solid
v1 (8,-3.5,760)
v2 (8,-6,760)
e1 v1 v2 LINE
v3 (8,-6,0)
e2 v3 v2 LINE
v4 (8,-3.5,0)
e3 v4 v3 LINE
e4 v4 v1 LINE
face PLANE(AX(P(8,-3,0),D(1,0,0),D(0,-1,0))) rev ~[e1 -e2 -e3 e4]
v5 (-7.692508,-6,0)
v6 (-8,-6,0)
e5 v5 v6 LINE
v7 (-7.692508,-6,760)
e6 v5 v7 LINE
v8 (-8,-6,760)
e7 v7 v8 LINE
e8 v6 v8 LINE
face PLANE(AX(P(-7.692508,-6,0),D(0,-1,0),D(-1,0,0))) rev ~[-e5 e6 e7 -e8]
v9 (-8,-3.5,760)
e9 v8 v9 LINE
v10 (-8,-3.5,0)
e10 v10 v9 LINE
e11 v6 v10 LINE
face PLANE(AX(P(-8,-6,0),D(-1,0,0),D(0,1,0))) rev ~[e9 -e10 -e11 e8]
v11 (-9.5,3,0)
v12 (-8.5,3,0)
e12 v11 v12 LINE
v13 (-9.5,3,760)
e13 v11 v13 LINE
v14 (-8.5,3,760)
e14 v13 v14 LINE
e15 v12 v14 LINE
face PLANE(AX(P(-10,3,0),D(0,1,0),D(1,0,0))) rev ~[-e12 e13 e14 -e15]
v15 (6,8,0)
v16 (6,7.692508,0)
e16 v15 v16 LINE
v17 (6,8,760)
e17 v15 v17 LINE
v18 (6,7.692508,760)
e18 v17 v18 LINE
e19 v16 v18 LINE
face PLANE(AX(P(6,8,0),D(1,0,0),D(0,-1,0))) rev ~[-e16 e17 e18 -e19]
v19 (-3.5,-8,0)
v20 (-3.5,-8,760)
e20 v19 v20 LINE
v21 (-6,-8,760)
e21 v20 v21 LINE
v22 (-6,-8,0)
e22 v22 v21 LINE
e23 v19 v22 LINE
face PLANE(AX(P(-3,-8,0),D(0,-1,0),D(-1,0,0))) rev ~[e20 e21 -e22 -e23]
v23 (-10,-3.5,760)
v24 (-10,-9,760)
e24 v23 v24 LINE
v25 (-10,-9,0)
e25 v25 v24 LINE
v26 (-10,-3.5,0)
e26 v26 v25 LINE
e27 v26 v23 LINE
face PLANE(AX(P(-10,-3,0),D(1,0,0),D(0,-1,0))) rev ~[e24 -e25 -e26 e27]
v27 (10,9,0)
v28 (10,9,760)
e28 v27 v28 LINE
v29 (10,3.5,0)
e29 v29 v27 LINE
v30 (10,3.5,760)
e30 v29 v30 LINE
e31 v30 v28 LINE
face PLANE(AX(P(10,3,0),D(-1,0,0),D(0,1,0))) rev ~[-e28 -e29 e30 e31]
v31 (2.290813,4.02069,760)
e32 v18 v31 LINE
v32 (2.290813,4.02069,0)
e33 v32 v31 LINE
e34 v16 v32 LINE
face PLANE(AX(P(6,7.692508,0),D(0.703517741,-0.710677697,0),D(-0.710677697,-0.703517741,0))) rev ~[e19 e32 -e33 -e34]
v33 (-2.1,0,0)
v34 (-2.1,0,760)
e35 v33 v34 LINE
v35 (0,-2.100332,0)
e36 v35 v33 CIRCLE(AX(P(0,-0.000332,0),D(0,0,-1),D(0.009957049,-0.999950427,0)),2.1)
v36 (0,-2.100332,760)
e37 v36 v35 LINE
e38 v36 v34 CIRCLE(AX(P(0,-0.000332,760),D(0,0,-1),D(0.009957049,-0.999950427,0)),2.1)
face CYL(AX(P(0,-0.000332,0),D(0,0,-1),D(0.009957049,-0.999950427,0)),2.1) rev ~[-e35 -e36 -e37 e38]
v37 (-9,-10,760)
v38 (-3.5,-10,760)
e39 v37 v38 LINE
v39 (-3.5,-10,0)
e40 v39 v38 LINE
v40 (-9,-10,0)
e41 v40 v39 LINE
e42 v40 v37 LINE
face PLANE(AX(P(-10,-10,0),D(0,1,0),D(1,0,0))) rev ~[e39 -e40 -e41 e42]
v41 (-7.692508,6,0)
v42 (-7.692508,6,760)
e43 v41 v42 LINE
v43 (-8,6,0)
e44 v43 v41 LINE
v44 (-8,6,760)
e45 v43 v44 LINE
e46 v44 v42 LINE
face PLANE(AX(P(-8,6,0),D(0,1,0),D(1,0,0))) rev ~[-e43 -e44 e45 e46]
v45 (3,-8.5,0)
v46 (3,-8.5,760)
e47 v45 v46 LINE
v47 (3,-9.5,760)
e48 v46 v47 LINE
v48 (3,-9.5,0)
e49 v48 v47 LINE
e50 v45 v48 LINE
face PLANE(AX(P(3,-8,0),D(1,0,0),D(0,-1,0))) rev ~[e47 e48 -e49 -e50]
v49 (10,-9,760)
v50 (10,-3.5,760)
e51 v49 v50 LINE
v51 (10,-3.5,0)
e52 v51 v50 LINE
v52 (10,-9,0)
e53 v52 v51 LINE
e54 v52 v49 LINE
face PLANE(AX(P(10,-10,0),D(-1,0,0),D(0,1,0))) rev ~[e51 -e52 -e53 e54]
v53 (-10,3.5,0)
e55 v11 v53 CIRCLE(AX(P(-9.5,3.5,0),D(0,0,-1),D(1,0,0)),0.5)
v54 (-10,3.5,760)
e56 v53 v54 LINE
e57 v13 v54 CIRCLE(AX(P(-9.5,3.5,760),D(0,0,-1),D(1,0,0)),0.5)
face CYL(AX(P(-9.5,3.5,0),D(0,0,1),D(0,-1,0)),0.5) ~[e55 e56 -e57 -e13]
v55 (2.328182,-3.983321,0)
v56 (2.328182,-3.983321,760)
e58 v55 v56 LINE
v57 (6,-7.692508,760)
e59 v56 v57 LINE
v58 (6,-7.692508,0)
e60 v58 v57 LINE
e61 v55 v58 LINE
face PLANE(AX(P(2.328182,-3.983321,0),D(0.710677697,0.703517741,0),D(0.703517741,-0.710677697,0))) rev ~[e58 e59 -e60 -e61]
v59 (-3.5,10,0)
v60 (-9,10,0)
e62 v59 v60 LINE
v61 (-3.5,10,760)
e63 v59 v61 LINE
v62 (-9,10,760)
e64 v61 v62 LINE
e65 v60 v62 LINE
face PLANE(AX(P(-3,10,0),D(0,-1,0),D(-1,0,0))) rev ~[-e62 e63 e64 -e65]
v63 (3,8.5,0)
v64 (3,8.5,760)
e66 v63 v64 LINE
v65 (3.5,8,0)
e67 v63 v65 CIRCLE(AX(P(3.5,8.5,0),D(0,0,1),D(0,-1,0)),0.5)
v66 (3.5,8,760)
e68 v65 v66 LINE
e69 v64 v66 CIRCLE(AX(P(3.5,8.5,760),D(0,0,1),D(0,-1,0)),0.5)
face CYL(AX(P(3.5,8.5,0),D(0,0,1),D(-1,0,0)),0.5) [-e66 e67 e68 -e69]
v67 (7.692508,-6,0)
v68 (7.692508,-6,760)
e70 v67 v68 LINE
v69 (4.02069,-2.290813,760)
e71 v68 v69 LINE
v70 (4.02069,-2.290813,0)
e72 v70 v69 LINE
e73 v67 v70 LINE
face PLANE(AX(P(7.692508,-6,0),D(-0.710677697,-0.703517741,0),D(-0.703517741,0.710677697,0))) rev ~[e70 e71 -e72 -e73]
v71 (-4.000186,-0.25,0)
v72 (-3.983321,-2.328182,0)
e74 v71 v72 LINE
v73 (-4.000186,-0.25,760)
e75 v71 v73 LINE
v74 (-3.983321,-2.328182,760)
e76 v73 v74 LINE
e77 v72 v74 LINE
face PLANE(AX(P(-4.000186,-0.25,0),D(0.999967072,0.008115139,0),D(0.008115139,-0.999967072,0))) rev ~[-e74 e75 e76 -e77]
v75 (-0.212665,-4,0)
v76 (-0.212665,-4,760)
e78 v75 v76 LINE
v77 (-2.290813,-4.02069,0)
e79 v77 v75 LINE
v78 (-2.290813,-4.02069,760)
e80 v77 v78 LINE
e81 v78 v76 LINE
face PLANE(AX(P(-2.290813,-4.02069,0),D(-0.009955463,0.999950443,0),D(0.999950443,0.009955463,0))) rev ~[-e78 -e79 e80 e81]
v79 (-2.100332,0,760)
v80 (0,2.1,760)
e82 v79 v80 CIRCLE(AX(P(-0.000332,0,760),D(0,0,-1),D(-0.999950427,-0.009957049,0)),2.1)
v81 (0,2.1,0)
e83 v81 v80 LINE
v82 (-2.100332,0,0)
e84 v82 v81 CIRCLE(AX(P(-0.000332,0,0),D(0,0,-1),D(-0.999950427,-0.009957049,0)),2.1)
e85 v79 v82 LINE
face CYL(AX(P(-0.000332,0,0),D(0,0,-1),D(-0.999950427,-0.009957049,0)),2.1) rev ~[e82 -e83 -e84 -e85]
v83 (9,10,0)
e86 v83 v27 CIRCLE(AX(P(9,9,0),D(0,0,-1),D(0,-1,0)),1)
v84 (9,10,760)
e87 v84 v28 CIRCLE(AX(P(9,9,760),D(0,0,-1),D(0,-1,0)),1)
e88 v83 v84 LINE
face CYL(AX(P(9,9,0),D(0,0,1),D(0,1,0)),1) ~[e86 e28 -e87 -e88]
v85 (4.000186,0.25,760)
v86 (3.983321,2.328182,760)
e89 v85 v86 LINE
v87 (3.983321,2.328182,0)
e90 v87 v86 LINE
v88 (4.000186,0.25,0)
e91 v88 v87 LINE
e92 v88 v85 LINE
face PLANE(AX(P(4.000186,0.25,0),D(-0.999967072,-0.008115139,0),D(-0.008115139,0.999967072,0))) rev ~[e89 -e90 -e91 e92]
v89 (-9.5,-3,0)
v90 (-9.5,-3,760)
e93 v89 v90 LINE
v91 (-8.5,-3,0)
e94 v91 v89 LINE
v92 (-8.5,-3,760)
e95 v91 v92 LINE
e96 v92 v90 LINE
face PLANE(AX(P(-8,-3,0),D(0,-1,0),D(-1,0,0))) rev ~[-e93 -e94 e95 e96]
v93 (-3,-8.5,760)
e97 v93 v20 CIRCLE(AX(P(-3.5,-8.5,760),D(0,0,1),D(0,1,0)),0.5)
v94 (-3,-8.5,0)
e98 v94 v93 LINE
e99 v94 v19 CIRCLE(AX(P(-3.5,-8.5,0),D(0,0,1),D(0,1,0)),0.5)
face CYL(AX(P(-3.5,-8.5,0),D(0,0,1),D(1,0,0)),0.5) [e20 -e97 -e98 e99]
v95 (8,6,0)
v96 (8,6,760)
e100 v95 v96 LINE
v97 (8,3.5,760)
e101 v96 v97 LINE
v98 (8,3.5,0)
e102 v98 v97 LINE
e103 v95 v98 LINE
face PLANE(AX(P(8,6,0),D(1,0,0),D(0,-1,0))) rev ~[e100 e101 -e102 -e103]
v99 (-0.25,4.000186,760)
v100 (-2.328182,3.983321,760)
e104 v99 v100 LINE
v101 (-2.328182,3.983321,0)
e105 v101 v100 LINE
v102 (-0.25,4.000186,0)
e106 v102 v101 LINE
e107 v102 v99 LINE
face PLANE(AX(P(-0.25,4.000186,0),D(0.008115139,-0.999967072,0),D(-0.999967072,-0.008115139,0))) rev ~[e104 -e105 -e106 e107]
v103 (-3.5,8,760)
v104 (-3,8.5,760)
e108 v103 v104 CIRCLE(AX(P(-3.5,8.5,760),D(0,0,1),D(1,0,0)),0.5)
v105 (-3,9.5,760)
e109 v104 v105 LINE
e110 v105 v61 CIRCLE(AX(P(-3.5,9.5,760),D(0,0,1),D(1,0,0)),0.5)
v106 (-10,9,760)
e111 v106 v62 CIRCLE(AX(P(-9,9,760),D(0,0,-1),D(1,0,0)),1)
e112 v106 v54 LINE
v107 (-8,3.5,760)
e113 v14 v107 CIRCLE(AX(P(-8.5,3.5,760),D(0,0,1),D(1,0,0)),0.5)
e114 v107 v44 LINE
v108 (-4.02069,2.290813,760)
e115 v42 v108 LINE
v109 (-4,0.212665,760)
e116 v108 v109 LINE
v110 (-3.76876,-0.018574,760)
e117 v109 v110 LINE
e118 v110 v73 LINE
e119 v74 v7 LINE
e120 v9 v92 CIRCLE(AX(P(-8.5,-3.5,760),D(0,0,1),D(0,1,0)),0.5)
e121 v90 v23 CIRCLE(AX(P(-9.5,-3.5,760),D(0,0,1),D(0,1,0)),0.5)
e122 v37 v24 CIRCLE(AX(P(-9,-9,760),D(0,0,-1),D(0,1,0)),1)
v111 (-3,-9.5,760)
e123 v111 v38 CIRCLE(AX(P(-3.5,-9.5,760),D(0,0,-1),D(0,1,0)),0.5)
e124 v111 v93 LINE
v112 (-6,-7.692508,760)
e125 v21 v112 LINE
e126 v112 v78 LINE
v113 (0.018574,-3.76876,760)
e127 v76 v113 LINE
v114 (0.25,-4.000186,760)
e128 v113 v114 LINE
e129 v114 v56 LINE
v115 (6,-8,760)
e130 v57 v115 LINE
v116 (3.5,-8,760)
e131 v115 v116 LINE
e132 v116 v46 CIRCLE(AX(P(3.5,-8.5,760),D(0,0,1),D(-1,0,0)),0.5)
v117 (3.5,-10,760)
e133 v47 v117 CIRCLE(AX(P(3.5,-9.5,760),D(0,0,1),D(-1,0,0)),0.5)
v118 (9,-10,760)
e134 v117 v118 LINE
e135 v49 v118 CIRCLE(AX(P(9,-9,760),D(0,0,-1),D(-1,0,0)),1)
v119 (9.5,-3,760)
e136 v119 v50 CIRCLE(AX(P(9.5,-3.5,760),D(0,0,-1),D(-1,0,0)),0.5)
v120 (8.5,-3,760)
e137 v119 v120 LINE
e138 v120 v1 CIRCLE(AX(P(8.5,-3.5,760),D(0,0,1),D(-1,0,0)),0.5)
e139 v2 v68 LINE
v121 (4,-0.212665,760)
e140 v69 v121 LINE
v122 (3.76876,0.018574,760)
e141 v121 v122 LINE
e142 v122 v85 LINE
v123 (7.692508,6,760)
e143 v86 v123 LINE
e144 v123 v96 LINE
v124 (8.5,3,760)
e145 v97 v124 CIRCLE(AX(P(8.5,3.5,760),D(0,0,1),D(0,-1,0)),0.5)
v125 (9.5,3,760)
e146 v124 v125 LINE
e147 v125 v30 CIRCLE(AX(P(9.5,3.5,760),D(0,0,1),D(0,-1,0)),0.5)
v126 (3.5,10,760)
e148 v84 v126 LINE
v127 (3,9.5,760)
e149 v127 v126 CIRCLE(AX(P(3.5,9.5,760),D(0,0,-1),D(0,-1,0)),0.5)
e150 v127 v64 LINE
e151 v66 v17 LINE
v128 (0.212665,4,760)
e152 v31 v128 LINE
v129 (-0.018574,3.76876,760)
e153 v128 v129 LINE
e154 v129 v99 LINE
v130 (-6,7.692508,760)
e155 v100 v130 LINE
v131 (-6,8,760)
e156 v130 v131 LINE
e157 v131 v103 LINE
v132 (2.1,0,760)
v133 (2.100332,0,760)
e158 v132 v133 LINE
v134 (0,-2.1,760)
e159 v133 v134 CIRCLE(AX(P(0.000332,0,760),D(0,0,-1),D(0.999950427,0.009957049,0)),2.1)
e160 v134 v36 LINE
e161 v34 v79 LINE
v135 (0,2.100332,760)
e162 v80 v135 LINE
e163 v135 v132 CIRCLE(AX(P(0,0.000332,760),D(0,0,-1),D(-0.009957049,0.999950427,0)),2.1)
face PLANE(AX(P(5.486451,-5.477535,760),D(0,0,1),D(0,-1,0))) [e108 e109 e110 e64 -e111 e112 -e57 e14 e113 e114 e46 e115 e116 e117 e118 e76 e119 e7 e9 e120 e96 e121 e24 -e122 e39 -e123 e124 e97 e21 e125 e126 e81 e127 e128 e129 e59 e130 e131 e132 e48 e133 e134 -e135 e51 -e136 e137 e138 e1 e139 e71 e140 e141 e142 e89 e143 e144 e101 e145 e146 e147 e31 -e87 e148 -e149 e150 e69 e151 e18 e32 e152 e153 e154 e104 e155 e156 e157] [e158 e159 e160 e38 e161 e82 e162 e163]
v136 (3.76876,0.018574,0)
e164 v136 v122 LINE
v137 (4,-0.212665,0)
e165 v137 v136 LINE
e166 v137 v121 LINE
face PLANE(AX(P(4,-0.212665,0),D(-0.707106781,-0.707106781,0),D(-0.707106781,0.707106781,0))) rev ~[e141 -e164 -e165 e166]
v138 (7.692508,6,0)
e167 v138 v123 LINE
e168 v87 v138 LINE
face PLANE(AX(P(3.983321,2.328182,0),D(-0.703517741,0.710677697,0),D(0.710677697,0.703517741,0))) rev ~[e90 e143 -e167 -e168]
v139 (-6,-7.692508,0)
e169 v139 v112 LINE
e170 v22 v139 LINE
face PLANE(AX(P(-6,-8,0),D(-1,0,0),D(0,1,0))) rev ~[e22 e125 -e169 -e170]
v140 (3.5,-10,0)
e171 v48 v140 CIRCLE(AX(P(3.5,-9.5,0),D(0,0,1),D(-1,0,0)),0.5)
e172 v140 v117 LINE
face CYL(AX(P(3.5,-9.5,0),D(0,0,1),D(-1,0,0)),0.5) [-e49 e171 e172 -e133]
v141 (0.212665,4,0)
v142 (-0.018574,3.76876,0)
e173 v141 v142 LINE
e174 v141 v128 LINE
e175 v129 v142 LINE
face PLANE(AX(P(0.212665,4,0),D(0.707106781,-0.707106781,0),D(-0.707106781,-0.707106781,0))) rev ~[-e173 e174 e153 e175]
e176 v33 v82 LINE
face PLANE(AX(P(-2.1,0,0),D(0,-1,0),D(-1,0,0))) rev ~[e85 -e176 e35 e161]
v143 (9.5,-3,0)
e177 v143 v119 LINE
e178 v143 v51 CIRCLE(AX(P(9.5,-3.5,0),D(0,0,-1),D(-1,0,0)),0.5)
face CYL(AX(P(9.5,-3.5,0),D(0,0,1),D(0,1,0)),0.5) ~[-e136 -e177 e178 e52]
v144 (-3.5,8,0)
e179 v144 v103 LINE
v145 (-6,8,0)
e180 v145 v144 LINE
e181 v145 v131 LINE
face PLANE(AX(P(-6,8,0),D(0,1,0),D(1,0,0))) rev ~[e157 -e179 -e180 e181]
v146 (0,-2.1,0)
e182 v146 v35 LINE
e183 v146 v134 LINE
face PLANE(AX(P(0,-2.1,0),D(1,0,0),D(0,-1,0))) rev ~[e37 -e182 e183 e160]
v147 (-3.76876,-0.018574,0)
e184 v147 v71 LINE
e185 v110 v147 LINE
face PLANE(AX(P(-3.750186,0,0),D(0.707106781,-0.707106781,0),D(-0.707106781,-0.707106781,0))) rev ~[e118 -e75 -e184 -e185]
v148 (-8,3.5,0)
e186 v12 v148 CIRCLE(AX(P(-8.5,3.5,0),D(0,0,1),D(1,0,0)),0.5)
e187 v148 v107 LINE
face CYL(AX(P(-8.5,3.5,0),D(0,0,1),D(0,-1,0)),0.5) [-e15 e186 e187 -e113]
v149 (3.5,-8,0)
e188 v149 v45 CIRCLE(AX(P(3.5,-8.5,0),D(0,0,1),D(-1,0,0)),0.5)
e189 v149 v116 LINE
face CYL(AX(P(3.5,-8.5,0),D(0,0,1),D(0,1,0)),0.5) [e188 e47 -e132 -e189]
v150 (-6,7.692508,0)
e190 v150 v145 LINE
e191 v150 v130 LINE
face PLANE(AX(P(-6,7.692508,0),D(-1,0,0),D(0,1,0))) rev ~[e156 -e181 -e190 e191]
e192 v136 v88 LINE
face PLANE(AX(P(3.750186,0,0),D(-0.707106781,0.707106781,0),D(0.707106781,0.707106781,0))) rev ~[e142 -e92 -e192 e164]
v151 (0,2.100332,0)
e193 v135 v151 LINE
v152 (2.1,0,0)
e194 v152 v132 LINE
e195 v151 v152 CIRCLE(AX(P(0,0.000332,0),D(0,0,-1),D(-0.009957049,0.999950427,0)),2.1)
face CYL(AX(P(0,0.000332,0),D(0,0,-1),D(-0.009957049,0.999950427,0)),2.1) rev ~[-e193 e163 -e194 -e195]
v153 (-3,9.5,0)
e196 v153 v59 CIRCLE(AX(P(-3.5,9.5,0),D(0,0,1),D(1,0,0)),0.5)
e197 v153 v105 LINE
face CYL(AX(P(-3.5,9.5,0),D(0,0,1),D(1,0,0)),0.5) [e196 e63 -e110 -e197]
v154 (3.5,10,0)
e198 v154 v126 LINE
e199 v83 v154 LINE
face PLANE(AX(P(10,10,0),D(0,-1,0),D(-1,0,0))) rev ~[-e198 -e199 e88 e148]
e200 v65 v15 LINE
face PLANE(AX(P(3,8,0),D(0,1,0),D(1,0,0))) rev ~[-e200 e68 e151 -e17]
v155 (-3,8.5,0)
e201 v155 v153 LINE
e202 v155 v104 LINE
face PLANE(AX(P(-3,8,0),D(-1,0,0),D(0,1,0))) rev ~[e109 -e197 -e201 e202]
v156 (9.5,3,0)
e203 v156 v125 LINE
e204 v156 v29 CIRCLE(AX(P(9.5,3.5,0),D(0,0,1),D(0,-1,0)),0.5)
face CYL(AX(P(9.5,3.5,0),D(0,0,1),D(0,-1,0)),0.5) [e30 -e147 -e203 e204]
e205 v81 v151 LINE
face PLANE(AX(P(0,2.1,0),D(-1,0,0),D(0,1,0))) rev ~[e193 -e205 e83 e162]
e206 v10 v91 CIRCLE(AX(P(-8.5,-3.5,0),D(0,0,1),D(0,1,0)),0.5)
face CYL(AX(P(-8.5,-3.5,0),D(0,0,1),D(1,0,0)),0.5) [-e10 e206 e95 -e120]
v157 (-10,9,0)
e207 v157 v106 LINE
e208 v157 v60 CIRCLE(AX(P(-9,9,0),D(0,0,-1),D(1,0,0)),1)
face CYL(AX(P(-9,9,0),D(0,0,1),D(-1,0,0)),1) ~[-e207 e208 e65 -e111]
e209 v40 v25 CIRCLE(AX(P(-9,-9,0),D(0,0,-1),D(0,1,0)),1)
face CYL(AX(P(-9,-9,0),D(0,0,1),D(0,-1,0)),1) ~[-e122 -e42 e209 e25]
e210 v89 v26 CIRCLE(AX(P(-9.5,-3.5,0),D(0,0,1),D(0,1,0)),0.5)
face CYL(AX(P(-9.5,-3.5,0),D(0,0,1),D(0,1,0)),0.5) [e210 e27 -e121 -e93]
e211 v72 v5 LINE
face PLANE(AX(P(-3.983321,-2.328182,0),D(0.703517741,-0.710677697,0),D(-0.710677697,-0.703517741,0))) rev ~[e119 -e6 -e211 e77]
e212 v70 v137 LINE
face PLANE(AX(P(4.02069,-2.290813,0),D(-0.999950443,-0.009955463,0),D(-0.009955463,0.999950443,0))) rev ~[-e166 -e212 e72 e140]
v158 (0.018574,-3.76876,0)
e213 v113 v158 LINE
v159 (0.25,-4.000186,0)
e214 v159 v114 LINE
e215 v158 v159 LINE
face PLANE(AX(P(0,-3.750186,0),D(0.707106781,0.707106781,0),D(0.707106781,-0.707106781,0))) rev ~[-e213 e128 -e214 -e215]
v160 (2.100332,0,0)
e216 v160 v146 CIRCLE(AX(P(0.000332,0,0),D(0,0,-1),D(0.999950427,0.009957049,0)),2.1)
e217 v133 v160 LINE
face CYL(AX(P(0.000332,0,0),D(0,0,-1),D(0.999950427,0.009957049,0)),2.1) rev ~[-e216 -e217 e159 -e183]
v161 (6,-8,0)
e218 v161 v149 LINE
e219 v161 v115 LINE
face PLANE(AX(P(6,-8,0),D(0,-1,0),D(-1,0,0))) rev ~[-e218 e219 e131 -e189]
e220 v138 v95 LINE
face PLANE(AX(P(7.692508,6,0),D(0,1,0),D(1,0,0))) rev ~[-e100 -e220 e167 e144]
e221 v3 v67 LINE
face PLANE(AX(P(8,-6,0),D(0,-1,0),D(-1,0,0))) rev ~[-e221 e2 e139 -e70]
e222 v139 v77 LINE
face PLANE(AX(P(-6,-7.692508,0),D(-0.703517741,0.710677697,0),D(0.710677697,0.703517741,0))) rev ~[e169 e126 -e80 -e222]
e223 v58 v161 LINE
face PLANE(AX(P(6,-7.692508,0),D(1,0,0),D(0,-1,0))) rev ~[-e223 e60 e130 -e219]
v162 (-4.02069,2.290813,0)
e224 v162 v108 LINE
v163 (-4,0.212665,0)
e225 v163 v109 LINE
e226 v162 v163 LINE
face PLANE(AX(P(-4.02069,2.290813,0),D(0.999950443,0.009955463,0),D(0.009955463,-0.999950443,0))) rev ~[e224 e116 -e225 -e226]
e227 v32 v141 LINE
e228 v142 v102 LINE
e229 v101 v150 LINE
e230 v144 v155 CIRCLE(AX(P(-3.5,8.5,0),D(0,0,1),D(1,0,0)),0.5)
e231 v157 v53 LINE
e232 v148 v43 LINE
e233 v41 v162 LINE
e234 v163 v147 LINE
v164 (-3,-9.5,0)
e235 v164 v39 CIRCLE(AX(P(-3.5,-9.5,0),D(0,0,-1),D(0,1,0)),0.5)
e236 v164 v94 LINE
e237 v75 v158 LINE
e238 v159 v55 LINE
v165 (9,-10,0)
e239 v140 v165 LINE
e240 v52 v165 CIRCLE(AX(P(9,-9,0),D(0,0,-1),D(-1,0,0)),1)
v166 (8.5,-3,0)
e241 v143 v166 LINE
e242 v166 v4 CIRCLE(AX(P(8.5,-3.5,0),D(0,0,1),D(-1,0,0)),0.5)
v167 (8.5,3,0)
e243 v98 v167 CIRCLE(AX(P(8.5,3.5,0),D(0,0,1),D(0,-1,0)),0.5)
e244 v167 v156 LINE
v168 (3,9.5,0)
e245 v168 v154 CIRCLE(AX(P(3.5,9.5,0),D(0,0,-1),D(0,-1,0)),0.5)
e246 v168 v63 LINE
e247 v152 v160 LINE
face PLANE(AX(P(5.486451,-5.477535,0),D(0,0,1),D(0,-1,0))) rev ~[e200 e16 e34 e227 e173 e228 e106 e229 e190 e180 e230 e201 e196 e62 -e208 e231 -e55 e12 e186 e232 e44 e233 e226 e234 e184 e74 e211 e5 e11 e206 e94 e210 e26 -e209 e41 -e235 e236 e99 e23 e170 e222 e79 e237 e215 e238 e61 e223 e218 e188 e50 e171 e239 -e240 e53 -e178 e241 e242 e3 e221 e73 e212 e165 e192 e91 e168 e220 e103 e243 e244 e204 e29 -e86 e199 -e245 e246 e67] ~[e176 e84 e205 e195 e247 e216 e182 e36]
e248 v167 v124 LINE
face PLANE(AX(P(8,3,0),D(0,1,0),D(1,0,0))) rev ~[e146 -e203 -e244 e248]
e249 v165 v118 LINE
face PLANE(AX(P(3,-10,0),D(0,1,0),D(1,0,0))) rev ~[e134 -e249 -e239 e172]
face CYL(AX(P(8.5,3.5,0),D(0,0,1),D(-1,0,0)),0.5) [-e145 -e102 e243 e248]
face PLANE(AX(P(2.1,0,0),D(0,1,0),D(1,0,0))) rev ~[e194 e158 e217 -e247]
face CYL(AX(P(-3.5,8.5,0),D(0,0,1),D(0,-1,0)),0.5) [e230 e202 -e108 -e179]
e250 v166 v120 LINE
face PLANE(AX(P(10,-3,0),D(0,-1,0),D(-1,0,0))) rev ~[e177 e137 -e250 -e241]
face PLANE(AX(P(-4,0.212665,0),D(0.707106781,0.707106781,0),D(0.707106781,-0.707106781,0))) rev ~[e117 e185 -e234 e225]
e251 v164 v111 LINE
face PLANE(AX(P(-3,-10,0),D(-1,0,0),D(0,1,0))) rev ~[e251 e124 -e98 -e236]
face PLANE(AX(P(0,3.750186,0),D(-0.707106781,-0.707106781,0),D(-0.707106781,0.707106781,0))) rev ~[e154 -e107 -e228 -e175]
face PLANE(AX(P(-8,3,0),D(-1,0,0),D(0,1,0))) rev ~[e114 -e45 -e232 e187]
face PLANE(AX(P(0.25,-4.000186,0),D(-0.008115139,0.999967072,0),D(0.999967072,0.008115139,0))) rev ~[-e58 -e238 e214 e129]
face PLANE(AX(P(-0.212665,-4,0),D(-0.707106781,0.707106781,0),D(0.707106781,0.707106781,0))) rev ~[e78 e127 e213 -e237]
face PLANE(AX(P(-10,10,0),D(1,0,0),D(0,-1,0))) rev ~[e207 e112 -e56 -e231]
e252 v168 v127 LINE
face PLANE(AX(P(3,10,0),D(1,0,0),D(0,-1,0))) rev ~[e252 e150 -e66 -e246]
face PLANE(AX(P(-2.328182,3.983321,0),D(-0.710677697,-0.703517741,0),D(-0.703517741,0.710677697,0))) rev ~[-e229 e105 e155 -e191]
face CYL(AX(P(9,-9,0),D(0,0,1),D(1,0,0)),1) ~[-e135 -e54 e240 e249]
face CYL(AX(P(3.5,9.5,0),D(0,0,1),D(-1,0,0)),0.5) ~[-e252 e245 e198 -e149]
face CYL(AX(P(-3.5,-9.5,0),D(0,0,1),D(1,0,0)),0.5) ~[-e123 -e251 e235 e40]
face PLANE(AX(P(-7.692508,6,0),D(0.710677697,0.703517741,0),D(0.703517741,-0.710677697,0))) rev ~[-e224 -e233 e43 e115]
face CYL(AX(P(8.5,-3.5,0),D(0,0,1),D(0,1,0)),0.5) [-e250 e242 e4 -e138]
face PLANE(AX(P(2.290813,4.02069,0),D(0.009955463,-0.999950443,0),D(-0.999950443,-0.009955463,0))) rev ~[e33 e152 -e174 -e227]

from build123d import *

# Parameters (mm, degrees)
F2_DEPTH = 760
F4_R     = 0.5
F5_R     = 1
F6_COUNT = 4


with BuildPart() as f2:
    # F1 (on Top) → F2 (new body)
    with BuildSketch(Plane.XY):
        with BuildLine():
            Line((3.0000000262, 10), (3.0000000262, 8))
            Line((3.0000000262, 8), (6.0000000262, 8))
            Line((6.0000000262, 8), (6.0000000262, 7.6925075952))
            Line((6.0000000262, 7.6925075952), (2.290812958, 4.0206899498))
            Line((2.290812958, 4.0206899498), (0.2126651618, 4))
            Line((0.2126651618, 4), (-0.0373348382, 3.75))
            Line((-0.0373348382, 3.75), (-0.0209097774, 2.1002278027))
            ThreePointArc((-0.0209097774, 2.1002278027), (1.4776309645, 1.4925138011), (2.1, 0))
            Line((2.1, 0), (3.7501858474, 0))
            Line((3.7501858474, 0), (4.0001858474, 0.25))
            Line((4.0001858474, 0.25), (3.9833205532, 2.3281823546))
            Line((3.9833205532, 2.3281823546), (7.6925076214, 6))
            Line((7.6925076214, 6), (8.0000000262, 6))
            Line((8.0000000262, 6), (8.0000000262, 3))
            Line((8.0000000262, 3), (10.0000000262, 3))
            Line((10.0000000262, 3), (10.0000000262, 10))
            Line((10.0000000262, 10), (3.0000000262, 10))
        make_face()
    extrude(amount=F2_DEPTH)

    # F4
    f4_edges = [f2.edges().sort_by_distance(p)[0] for p in [
        (3, 10, 380),
        (10, 3, 380),
        (8, 3, 380),
        (3, 8, 380),
    ]]
    fillet(f4_edges, radius=F4_R)

    # F5
    f5_edges = [f2.edges().sort_by_distance(p)[0] for p in [
        (10, 10, 380),
    ]]
    fillet(f5_edges, radius=F5_R)

    # F6: F2 ×4 about axis
    f6_axis = Axis((0, 0, 380), (0, 0, 1))


with BuildPart() as f2_1:
    add(f2.part)
    for i in range(1, F6_COUNT):
        add(f2.part.rotate(f6_axis, i * 360 / F6_COUNT))


solid = f2_1.part
